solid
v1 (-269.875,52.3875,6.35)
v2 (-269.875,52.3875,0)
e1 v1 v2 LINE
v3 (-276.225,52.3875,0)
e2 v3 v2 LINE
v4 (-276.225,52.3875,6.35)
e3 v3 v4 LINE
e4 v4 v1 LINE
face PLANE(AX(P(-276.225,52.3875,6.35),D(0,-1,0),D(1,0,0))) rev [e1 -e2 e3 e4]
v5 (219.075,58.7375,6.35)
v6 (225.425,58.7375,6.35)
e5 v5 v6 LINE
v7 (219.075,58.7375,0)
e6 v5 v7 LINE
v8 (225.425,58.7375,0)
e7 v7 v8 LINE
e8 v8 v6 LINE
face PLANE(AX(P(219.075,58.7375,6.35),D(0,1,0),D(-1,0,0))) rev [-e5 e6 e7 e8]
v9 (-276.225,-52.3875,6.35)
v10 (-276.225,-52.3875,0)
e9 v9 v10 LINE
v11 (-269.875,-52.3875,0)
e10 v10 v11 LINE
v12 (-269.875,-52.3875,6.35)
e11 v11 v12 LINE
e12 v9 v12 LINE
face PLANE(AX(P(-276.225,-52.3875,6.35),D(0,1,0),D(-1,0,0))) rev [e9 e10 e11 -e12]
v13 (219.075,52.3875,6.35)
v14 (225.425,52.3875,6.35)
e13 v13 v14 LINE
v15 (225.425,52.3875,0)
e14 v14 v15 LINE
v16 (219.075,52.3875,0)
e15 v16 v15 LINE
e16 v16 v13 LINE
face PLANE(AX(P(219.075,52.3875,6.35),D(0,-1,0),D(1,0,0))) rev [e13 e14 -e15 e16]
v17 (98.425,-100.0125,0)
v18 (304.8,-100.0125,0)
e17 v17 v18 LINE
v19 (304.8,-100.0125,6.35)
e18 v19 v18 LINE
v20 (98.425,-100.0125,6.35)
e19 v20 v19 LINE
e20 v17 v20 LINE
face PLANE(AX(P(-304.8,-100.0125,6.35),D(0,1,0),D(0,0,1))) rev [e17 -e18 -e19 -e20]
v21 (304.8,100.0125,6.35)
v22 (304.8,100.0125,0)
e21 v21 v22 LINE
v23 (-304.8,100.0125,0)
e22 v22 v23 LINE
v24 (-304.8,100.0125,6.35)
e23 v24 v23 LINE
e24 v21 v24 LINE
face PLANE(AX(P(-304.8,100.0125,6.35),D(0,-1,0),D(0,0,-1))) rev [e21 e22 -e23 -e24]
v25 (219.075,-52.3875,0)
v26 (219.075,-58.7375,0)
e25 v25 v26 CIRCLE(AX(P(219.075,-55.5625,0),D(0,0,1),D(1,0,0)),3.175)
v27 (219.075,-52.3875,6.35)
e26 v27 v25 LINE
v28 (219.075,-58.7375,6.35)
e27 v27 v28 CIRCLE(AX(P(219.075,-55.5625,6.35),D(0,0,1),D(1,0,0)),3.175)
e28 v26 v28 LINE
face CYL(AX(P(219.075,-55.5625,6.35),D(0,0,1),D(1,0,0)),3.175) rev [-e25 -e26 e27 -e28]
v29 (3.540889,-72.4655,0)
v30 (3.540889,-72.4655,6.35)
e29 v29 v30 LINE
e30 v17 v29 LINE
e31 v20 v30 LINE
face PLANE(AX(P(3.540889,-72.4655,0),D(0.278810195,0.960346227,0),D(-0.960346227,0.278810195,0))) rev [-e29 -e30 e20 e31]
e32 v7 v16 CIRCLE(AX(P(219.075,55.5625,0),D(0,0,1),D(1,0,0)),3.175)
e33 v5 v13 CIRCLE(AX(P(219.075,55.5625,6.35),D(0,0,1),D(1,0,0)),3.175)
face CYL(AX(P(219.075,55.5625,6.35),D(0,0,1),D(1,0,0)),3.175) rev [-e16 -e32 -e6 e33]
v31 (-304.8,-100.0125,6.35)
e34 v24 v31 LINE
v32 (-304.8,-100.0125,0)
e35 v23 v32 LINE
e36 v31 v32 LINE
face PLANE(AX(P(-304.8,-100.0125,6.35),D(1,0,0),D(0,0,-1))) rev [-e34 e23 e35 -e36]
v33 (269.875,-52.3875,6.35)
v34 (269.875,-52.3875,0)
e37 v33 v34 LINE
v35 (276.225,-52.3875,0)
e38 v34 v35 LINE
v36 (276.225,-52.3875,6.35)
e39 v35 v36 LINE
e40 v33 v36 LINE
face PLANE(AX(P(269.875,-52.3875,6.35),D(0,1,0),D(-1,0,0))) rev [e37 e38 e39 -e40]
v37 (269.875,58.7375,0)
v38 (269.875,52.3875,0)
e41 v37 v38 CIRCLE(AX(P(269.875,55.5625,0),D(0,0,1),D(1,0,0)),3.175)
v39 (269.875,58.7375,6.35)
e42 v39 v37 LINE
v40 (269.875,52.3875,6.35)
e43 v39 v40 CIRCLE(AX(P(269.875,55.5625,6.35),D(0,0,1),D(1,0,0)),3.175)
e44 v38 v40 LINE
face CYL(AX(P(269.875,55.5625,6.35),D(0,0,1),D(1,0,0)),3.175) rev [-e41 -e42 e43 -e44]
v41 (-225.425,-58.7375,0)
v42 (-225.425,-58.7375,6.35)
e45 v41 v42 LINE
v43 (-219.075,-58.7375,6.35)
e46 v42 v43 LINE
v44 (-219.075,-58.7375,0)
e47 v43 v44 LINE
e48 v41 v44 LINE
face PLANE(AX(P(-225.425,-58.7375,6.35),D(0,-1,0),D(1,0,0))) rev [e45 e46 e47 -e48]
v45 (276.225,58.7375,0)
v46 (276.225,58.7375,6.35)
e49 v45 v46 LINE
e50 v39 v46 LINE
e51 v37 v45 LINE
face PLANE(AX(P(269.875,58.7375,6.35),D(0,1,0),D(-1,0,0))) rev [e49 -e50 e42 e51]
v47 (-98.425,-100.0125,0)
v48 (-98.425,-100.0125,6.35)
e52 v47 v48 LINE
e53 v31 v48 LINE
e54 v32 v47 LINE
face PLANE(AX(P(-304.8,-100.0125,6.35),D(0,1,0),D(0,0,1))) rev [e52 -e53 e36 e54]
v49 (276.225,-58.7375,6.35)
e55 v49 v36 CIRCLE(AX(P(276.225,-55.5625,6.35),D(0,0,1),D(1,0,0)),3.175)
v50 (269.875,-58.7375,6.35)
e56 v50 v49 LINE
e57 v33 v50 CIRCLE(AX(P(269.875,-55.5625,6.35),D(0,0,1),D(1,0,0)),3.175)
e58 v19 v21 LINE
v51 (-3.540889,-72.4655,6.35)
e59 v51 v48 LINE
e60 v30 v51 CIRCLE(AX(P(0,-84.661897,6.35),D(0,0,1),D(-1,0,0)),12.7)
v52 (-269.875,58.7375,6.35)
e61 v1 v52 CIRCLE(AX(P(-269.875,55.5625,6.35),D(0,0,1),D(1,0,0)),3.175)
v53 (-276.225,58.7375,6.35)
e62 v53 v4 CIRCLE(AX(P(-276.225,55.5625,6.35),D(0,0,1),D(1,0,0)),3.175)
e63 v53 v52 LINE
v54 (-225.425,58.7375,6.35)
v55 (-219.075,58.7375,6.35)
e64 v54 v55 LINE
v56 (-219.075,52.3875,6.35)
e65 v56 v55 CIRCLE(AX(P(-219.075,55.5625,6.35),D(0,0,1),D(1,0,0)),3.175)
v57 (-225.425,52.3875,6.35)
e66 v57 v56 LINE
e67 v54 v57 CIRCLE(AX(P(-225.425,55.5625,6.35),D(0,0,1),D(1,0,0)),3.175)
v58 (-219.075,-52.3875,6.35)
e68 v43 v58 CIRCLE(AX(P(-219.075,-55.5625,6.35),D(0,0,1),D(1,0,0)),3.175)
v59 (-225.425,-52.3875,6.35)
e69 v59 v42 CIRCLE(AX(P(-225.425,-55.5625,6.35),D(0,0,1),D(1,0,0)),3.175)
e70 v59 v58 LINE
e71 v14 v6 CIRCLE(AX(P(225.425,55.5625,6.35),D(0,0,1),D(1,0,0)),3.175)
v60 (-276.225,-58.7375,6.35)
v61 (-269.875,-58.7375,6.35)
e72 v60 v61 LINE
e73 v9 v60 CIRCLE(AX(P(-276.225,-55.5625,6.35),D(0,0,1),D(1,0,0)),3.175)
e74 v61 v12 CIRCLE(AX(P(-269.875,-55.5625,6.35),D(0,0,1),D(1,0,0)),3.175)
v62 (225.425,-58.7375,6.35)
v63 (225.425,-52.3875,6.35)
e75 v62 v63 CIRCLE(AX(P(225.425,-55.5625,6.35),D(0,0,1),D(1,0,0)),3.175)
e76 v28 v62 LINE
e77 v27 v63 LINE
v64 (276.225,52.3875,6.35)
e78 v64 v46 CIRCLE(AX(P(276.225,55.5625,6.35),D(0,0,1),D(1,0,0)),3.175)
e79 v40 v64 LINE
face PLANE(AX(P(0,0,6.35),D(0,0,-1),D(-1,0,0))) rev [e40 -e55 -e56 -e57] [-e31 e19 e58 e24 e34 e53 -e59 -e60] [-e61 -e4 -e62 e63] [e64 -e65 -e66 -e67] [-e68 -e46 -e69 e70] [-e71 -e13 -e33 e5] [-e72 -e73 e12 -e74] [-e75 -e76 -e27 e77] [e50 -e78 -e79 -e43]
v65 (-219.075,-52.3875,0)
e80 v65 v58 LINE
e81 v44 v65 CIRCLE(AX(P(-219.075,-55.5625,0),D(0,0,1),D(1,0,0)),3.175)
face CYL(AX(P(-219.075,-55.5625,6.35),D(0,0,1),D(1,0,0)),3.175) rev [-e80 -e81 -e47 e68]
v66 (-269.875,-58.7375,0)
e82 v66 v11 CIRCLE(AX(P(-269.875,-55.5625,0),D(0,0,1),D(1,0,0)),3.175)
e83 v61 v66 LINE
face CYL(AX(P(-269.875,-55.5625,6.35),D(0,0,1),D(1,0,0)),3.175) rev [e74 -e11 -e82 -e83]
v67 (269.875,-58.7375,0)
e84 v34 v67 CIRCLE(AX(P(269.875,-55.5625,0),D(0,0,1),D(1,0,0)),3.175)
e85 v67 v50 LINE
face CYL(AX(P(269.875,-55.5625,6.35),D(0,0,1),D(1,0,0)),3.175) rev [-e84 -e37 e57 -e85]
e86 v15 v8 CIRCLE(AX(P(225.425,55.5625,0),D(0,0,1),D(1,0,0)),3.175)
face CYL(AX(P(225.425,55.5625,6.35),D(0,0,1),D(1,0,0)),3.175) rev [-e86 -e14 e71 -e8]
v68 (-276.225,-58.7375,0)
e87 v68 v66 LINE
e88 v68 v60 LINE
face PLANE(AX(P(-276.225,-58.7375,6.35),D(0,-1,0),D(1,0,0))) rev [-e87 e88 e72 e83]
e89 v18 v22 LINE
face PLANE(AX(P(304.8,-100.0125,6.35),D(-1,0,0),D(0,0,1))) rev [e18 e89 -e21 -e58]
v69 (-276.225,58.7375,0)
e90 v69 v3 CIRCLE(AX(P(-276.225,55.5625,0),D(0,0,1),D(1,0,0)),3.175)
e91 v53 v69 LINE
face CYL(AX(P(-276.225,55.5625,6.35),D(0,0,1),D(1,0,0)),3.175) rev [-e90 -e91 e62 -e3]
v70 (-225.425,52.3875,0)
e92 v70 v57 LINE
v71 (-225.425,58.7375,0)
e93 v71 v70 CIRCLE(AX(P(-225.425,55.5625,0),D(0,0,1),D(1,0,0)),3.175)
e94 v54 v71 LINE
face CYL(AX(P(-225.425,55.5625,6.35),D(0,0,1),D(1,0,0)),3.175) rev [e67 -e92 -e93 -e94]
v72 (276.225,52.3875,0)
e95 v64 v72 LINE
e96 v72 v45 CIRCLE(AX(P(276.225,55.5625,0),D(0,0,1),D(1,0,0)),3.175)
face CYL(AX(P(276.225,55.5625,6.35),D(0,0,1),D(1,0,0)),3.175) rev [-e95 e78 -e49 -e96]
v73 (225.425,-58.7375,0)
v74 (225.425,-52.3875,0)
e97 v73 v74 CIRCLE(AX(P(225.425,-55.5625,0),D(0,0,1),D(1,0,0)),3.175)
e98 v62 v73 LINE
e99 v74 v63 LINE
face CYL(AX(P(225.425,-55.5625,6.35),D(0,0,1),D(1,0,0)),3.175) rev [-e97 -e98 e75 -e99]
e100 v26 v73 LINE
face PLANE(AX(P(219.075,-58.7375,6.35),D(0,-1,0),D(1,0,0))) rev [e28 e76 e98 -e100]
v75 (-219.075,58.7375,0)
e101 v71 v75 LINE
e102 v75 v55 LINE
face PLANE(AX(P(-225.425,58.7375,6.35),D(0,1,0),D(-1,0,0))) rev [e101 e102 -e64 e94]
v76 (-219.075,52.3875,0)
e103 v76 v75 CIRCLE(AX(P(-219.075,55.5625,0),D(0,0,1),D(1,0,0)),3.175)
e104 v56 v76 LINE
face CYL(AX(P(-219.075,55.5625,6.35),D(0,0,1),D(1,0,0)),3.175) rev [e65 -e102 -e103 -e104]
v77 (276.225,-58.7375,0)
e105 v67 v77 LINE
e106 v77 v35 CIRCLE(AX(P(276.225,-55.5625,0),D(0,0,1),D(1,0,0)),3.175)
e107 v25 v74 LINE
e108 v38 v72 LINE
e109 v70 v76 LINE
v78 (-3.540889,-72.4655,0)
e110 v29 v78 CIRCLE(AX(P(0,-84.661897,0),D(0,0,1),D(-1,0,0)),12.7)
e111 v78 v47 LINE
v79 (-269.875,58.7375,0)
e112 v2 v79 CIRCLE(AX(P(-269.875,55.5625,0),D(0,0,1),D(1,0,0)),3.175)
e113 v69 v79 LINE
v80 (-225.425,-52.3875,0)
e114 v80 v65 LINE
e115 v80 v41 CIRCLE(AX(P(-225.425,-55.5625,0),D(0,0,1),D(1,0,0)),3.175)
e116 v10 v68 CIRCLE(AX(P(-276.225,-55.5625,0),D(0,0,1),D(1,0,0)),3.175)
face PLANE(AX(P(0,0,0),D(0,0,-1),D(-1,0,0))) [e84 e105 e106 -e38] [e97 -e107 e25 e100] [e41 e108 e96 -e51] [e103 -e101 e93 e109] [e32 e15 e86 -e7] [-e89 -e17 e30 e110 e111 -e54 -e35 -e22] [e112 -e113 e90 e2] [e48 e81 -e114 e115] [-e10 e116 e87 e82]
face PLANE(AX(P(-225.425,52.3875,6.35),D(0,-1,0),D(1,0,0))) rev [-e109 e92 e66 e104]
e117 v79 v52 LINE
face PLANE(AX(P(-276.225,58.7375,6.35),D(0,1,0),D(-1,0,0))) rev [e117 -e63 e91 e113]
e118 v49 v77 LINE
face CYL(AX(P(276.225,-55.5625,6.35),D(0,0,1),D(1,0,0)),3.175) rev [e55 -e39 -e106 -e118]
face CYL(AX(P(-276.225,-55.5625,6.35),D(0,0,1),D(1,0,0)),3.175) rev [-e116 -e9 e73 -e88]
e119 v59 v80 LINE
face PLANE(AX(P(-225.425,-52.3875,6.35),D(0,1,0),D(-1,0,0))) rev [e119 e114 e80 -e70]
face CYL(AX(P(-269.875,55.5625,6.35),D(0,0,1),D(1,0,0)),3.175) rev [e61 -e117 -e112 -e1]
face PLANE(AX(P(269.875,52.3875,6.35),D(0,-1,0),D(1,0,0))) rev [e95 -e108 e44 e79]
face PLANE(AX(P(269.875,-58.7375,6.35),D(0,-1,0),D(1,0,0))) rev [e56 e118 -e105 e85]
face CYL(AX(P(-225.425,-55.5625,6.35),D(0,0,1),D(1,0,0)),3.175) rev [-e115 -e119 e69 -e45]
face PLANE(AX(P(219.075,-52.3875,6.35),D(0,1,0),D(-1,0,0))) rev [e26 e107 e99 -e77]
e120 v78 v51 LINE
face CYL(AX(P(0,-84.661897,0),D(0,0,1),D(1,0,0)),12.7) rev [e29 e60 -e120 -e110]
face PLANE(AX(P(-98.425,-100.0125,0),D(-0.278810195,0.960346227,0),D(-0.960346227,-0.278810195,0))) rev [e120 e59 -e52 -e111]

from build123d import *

# Parameters (mm, degrees)
SKETCH1_W                       = 609.6
SKETCH1_H                       = 200.025
BOSS_EXTRUDE1_DEPTH             = 6.35
F_1_4_0_25_DIAMETER_SLOT1_DEPTH = 6.35
CUT_EXTRUDE1_DEPTH              = 321.85177677


# Read off the part's stored shape, not the designer's step: 1/4 (0.25) Diameter Slot1
with BuildPart() as part:
    # Sketch1 → Boss-Extrude1 (new body)
    with BuildSketch(Plane.XY):
        Rectangle(SKETCH1_W, SKETCH1_H)
    extrude(amount=BOSS_EXTRUDE1_DEPTH)

    # 1/4 (0.25) Diameter Slot1 outline → 1/4 (0.25) Diameter Slot1 (cut)
    with BuildSketch(Plane.XY):
        with BuildLine():
            Line((219.075, -58.7375), (225.425, -58.7375))
            ThreePointArc((225.425, -58.7375), (228.6, -55.5625), (225.425, -52.3875))
            Line((225.425, -52.3875), (219.075, -52.3875))
            ThreePointArc((219.075, -52.3875), (215.9, -55.5625), (219.075, -58.7375))
        make_face()
        with BuildLine():
            ThreePointArc((-219.075, -58.7375), (-215.9, -55.5625), (-219.075, -52.3875))
            Line((-219.075, -52.3875), (-225.425, -52.3875))
            ThreePointArc((-225.425, -52.3875), (-228.6, -55.5625), (-225.425, -58.7375))
            Line((-225.425, -58.7375), (-219.075, -58.7375))
        make_face()
        with BuildLine():
            ThreePointArc((276.225, -58.7375), (279.4, -55.5625), (276.225, -52.3875))
            Line((276.225, -52.3875), (269.875, -52.3875))
            ThreePointArc((269.875, -52.3875), (266.7, -55.5625), (269.875, -58.7375))
            Line((269.875, -58.7375), (276.225, -58.7375))
        make_face()
        with BuildLine():
            ThreePointArc((-269.875, -58.7375), (-266.7, -55.5625), (-269.875, -52.3875))
            Line((-269.875, -52.3875), (-276.225, -52.3875))
            ThreePointArc((-276.225, -52.3875), (-279.4, -55.5625), (-276.225, -58.7375))
            Line((-276.225, -58.7375), (-269.875, -58.7375))
        make_face()
        with BuildLine():
            Line((219.075, 52.3875), (225.425, 52.3875))
            ThreePointArc((225.425, 52.3875), (228.6, 55.5625), (225.425, 58.7375))
            Line((225.425, 58.7375), (219.075, 58.7375))
            ThreePointArc((219.075, 58.7375), (215.9, 55.5625), (219.075, 52.3875))
        make_face()
        with BuildLine():
            ThreePointArc((-219.075, 52.3875), (-215.9, 55.5625), (-219.075, 58.7375))
            Line((-219.075, 58.7375), (-225.425, 58.7375))
            ThreePointArc((-225.425, 58.7375), (-228.6, 55.5625), (-225.425, 52.3875))
            Line((-225.425, 52.3875), (-219.075, 52.3875))
        make_face()
        with BuildLine():
            ThreePointArc((276.225, 52.3875), (279.4, 55.5625), (276.225, 58.7375))
            Line((276.225, 58.7375), (269.875, 58.7375))
            ThreePointArc((269.875, 58.7375), (266.7, 55.5625), (269.875, 52.3875))
            Line((269.875, 52.3875), (276.225, 52.3875))
        make_face()
        with BuildLine():
            ThreePointArc((-269.875, 52.3875), (-266.7, 55.5625), (-269.875, 58.7375))
            Line((-269.875, 58.7375), (-276.225, 58.7375))
            ThreePointArc((-276.225, 58.7375), (-279.4, 55.5625), (-276.225, 52.3875))
            Line((-276.225, 52.3875), (-269.875, 52.3875))
        make_face()
    extrude(amount=F_1_4_0_25_DIAMETER_SLOT1_DEPTH, mode=Mode.SUBTRACT)

    # Sketch4 → Cut-Extrude1 (cut, through all)
    with BuildSketch(Plane.XY.offset(6.35)):
        with BuildLine():
            Line((-98.425, -100.0125), (-3.540889475, -72.46550017))
            ThreePointArc((-3.540889475, -72.46550017), (0, -71.96189725), (3.540889475, -72.46550017))
            Line((3.540889475, -72.46550017), (98.425, -100.0125))
            Line((98.425, -100.0125), (-98.425, -100.0125))
        make_face()
    extrude(amount=-CUT_EXTRUDE1_DEPTH, mode=Mode.SUBTRACT)


solid = part.part
